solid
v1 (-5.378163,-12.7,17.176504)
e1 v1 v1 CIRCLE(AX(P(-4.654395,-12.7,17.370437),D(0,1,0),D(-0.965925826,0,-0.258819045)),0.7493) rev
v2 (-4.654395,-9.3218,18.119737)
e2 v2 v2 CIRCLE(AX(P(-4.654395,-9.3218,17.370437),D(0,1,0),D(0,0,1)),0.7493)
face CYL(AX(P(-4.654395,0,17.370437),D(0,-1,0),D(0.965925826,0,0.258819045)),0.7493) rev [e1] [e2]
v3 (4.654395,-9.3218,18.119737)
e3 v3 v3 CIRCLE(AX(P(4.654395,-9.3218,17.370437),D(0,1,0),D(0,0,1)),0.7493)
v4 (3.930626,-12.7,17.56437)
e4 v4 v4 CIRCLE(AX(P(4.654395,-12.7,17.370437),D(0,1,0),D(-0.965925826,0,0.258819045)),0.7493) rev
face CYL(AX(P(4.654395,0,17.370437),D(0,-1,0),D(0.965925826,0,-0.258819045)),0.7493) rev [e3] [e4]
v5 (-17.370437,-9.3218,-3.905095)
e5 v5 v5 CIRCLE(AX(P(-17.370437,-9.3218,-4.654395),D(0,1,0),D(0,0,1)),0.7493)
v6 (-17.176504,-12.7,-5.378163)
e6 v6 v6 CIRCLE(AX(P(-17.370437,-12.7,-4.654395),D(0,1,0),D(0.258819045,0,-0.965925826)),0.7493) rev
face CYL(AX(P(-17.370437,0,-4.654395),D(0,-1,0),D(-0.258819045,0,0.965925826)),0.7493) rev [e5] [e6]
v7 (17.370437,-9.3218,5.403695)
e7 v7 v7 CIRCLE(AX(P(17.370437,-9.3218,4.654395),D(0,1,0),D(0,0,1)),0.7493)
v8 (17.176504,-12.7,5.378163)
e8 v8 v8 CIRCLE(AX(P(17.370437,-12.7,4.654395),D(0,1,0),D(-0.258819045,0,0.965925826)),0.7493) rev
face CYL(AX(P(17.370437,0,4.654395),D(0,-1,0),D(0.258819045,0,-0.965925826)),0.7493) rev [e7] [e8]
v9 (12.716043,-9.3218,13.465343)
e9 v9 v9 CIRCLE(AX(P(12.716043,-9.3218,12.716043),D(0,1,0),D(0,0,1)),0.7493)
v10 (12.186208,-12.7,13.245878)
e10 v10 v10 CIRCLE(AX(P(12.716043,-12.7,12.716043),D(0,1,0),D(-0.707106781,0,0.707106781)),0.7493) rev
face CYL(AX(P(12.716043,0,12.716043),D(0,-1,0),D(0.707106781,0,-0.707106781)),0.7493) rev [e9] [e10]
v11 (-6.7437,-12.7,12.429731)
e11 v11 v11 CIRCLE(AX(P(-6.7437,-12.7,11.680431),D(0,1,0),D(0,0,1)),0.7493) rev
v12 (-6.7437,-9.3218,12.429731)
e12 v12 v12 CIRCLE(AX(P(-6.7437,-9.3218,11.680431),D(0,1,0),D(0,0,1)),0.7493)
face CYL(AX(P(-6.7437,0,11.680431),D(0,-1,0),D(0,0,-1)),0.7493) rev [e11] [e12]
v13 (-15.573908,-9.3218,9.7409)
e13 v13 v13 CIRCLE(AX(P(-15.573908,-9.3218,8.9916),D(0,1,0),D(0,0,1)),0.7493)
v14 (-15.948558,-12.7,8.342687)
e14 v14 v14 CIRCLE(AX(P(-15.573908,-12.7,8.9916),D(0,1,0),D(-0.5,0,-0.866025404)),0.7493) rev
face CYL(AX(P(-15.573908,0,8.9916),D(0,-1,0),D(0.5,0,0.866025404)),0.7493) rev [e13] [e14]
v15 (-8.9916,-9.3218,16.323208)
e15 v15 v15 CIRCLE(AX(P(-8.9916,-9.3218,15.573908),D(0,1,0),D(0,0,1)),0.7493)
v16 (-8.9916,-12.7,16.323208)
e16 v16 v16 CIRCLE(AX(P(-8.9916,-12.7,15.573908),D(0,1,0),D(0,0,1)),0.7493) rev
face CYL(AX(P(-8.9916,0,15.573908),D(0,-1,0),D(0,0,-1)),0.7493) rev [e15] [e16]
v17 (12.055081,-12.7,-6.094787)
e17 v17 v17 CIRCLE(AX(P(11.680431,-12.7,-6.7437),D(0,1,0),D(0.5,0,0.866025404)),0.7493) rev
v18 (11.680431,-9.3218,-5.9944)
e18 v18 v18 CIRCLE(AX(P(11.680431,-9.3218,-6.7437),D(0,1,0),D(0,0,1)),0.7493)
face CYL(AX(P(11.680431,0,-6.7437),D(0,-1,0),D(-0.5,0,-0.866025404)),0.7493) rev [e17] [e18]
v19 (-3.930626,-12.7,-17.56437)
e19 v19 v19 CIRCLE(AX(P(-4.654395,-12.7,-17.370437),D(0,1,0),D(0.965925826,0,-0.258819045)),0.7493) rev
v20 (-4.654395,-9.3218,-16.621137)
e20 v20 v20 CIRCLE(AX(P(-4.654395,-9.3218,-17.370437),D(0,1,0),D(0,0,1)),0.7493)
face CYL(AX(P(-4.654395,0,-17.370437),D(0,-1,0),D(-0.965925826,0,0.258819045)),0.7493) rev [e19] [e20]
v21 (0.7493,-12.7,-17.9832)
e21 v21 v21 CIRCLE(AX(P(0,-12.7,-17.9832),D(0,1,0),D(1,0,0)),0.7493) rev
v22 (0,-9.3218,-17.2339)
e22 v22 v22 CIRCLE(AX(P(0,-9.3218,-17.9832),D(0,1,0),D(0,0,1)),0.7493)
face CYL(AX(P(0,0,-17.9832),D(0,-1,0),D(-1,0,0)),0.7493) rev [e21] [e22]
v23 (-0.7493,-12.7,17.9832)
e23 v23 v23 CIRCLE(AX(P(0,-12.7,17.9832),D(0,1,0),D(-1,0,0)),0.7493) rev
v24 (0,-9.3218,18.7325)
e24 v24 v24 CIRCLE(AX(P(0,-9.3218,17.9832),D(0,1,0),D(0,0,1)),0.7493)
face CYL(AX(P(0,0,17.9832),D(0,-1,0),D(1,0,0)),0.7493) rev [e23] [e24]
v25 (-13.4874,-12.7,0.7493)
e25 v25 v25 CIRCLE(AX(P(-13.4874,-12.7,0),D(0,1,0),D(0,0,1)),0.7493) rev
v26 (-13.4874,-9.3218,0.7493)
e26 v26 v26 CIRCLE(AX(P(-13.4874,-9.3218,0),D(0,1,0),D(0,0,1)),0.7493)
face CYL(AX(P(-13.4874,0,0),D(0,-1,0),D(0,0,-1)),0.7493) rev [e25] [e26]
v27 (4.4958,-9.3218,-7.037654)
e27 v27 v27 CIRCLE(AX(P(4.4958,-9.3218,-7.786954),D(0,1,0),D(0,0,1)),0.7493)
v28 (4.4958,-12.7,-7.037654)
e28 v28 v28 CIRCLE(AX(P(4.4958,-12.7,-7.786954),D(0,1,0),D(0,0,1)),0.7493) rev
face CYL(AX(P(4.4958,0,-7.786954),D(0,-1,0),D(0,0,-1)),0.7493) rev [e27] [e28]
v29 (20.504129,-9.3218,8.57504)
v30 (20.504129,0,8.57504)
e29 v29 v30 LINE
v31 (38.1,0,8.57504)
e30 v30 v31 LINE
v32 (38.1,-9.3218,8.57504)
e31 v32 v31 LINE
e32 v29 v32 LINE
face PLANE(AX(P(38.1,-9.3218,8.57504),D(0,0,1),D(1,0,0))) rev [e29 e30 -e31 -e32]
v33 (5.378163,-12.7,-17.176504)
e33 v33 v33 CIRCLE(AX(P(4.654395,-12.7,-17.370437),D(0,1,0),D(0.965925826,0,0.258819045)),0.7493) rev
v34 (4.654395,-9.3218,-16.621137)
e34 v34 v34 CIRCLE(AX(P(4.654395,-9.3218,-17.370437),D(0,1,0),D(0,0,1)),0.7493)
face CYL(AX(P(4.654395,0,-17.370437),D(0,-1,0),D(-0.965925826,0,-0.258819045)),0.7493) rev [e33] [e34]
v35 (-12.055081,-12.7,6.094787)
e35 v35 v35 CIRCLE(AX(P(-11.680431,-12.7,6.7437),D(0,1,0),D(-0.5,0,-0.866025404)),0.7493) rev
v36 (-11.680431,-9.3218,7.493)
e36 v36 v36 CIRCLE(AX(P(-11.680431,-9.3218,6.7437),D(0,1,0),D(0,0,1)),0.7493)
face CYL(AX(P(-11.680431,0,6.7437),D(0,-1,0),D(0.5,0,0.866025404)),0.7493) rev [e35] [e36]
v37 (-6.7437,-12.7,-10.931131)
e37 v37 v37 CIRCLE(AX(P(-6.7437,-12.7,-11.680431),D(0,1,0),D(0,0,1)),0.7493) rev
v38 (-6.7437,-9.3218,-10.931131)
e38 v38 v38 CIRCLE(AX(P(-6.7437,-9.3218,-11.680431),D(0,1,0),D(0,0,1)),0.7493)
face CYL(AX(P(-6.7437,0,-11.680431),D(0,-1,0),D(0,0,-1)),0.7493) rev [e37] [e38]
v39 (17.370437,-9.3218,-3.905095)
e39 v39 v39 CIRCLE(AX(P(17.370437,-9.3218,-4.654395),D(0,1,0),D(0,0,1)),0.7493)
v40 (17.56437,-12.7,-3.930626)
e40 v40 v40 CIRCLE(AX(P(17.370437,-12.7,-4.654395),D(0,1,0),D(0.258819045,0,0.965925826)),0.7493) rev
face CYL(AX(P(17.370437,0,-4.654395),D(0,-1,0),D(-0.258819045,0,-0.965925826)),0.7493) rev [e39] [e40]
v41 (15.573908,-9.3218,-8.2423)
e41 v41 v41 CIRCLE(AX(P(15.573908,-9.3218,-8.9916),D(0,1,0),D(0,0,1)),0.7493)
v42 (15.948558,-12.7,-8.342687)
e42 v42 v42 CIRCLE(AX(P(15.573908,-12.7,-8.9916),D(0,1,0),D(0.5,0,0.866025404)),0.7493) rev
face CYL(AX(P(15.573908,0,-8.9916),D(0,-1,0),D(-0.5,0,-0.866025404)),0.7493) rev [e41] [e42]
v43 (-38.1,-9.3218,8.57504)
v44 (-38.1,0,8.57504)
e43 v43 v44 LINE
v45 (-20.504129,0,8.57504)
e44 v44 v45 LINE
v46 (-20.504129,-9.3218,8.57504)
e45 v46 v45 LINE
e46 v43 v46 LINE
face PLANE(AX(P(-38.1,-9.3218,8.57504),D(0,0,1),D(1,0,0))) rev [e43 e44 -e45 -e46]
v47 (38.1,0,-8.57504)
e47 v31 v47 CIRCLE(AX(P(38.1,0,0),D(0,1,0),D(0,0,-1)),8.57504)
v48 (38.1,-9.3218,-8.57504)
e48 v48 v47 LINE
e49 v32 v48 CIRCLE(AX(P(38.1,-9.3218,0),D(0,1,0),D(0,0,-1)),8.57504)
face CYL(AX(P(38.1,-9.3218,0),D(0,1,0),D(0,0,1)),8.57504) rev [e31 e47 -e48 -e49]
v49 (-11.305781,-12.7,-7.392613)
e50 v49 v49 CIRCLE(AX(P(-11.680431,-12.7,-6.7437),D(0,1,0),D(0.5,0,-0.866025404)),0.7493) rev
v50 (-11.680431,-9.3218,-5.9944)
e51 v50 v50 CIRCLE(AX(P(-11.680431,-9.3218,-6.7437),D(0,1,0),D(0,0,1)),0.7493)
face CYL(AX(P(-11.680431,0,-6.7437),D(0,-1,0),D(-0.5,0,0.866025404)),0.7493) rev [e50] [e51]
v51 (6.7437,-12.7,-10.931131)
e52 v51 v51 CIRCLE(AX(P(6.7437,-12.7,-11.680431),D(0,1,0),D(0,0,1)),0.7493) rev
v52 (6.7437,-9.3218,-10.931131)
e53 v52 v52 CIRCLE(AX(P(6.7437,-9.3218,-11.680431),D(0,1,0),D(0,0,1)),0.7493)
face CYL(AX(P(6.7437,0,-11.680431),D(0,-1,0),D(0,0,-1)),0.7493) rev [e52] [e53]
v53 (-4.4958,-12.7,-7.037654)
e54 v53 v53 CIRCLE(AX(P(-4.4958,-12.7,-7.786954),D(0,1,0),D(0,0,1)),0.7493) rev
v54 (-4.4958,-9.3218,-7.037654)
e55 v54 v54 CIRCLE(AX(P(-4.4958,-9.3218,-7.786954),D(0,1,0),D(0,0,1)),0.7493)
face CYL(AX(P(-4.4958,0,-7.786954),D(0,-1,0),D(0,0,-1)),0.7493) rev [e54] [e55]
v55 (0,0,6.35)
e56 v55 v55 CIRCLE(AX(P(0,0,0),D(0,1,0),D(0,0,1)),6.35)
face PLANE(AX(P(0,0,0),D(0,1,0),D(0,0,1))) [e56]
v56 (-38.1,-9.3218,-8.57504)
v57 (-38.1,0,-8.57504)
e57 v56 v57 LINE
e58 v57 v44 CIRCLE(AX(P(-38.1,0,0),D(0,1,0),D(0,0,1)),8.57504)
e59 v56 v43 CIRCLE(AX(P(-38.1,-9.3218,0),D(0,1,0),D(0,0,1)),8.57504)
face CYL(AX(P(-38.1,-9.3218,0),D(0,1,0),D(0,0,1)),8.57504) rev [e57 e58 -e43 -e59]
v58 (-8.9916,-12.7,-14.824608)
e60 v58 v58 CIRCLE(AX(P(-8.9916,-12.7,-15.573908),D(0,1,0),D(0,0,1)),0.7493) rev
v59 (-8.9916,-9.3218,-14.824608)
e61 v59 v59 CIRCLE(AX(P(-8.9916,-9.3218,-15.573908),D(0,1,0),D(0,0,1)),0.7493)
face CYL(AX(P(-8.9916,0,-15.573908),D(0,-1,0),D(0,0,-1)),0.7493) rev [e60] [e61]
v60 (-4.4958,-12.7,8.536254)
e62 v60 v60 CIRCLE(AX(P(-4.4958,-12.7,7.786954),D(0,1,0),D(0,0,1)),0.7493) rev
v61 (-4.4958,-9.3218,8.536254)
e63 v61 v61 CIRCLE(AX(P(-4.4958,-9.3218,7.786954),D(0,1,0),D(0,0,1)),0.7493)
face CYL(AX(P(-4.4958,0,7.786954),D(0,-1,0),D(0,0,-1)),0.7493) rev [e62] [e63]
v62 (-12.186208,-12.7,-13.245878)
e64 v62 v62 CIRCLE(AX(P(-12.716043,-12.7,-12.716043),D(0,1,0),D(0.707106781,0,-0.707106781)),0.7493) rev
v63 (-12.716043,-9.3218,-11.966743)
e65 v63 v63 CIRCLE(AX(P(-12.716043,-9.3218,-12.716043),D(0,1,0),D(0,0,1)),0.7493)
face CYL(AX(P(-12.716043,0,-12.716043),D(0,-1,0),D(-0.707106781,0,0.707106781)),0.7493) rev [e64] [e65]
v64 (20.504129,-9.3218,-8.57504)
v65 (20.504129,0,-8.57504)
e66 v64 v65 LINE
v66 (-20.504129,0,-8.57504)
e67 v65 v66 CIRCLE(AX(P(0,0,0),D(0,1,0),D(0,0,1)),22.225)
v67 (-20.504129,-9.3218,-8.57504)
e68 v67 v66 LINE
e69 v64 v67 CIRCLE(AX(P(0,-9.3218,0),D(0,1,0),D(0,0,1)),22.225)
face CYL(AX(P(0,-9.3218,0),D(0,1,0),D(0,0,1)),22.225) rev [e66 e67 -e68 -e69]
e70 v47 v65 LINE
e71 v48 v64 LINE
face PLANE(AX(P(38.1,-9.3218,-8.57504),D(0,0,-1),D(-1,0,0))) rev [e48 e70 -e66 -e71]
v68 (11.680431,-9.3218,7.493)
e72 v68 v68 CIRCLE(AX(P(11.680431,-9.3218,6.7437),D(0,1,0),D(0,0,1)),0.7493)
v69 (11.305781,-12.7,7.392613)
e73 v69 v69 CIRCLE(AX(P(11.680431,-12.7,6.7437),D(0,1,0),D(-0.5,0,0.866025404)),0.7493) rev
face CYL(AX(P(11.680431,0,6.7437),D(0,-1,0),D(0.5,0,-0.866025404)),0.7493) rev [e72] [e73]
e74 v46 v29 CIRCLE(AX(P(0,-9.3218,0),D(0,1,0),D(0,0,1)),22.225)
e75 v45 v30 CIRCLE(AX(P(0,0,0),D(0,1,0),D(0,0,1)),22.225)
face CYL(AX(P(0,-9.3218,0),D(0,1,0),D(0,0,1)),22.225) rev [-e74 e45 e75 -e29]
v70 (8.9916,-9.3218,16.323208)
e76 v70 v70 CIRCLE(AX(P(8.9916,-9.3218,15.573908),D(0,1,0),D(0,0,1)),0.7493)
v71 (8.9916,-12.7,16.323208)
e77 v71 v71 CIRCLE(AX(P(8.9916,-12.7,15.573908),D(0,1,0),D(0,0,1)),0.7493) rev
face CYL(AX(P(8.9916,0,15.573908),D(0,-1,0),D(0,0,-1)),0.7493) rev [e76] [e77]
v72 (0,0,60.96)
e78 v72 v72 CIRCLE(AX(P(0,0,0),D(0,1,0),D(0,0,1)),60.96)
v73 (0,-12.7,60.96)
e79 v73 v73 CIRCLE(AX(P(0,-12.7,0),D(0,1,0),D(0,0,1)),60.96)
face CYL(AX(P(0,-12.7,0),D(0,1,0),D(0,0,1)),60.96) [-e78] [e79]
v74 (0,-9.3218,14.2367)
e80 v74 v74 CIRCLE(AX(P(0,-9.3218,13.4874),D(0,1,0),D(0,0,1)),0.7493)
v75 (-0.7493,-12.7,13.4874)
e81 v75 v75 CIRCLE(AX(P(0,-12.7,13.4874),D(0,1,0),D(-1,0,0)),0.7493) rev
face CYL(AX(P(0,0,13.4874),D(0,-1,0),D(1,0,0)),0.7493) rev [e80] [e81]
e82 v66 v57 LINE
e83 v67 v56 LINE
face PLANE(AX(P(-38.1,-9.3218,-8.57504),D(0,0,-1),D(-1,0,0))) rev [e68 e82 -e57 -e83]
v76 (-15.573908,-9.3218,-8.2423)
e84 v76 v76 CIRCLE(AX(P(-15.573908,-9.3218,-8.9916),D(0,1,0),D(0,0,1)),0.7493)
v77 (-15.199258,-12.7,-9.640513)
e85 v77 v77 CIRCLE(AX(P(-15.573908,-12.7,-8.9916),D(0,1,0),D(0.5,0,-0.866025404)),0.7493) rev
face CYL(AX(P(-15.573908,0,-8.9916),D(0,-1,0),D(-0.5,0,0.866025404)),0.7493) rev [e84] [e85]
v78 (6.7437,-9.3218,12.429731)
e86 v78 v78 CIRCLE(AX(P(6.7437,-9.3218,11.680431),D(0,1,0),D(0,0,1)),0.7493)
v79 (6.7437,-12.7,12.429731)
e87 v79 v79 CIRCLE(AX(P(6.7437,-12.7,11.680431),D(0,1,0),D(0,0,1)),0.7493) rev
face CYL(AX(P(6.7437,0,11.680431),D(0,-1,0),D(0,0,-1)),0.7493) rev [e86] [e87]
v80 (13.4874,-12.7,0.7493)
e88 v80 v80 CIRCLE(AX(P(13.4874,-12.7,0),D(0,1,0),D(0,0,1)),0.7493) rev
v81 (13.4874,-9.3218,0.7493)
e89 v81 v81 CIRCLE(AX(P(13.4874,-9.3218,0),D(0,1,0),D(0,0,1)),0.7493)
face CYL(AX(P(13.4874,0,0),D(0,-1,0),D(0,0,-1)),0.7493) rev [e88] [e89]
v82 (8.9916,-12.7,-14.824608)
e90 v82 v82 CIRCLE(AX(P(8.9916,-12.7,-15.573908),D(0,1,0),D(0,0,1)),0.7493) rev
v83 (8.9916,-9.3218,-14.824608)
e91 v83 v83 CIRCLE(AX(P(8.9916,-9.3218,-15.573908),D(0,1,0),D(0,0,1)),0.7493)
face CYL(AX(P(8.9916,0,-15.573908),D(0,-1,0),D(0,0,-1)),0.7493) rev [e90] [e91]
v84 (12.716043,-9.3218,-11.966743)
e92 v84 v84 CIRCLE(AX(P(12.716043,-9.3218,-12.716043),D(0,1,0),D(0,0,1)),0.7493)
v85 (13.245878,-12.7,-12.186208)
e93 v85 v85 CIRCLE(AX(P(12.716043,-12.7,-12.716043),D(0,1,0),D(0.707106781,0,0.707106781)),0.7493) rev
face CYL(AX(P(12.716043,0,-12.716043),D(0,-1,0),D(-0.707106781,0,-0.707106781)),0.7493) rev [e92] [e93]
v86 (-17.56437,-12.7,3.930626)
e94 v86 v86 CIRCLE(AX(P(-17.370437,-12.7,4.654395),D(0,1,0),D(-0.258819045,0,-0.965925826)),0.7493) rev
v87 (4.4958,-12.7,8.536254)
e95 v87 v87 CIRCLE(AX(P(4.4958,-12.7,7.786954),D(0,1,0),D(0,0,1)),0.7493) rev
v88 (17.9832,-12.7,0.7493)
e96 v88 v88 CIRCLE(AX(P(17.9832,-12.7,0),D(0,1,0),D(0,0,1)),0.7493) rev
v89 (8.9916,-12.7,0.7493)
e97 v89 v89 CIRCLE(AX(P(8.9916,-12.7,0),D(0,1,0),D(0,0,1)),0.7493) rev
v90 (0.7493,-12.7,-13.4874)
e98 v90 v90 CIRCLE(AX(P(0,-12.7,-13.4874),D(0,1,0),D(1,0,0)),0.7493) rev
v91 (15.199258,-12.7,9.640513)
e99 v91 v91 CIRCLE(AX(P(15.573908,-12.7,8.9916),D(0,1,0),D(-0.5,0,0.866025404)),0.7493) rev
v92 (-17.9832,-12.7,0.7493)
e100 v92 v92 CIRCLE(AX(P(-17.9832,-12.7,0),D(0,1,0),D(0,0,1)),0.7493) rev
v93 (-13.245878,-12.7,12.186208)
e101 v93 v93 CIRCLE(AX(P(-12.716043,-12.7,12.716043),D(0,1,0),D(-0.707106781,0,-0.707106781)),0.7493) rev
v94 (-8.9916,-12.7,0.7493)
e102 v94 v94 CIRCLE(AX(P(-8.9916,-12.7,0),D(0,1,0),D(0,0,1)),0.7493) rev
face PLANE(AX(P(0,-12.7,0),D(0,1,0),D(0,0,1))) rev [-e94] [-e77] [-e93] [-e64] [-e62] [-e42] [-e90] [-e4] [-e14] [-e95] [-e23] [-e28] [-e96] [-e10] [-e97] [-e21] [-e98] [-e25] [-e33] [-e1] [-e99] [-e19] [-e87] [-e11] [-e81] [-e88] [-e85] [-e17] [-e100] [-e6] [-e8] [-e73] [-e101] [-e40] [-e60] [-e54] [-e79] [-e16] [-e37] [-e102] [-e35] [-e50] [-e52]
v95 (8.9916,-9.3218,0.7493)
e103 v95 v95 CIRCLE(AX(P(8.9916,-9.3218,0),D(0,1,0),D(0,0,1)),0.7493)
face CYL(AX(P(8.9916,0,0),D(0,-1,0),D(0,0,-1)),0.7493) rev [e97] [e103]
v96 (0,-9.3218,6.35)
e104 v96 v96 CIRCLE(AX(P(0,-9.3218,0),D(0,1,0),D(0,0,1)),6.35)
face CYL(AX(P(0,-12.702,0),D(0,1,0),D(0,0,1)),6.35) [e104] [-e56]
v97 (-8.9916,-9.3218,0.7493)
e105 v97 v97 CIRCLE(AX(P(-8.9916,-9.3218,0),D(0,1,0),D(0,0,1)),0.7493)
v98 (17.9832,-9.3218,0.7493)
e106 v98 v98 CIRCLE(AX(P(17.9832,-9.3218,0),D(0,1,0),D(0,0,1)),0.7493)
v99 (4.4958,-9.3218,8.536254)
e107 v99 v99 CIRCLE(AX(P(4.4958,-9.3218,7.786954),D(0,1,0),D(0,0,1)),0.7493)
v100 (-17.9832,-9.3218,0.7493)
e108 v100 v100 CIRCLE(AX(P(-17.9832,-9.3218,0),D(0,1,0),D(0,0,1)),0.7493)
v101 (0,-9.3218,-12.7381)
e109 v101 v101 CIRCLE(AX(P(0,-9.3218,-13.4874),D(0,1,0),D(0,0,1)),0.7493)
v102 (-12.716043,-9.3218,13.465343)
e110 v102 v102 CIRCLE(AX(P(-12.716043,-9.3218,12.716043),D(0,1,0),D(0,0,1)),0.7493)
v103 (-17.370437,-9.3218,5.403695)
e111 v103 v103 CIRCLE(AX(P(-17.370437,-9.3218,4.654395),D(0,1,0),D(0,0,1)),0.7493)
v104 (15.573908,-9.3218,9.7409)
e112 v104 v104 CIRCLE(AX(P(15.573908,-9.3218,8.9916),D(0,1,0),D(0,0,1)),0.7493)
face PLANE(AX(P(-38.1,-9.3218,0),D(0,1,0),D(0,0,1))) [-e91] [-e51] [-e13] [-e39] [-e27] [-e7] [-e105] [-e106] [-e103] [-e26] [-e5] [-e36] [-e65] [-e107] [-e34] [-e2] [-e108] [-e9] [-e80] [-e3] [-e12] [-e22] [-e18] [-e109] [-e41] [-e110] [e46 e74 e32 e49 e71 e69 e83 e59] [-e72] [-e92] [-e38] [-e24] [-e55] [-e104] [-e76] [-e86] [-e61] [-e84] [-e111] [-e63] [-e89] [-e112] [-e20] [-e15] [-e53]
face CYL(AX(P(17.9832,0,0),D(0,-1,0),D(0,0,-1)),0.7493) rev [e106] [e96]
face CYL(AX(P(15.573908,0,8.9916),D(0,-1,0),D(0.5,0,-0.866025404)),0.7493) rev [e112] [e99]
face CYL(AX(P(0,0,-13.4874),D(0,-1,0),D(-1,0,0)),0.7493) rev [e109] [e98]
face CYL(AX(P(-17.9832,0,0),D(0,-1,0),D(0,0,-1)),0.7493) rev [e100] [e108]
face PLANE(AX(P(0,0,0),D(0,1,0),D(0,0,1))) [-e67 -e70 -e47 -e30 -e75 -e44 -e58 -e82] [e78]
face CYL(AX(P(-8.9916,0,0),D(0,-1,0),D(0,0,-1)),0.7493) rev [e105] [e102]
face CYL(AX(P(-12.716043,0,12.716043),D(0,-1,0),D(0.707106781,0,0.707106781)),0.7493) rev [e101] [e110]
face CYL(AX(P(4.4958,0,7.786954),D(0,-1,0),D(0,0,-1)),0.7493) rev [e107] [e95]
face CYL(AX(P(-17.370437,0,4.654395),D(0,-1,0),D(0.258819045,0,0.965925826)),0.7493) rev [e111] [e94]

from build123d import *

# Parameters (mm, degrees)
SKETCH1_R                       = 60.96
BILLET_DEPTH                    = 12.7
SKETCH4_R                       = 0.7493
FIRST_KEROSENE_OUTLET_DEPTH     = 88.140881336
PRIMARY_HOLES_COUNT             = 6
SECOND_START                    = -12.7
SECOND_RING_OUTLINE_R           = 0.7493
SECOND_RING_DEPTH               = 12.7
THIRD_START                     = -12.7
THIRD_RING_OUTLINE_R            = 0.7493
THIRD_RING_DEPTH                = 12.7
KEROSENE_WELL_DEPTH             = 9.3218
SKETCH17_R                      = 6.35
BOSS_EXTRUDE1_DEPTH             = 2.54
BOSS_EXTRUDE1_DIRECTION_2_REACH = 89.141
SKETCH19_R                      = 6.35
LOX_TOWER_DEPTH                 = 2.54


# Read off the part's stored shape, not the designer's step: Second ring, Third Ring
with BuildPart() as part:
    # Sketch1 → Billet (new body)
    with BuildSketch(Plane(origin=(0, 0, 0), x_dir=(1, 0, 0), z_dir=(0, 1, 0))):
        with Locations(Location((0, 0, 0), (0, 0, 270))):
            Circle(SKETCH1_R)
    extrude(amount=-BILLET_DEPTH)

    # Sketch4 → First Kerosene Outlet (cut, symmetric)
    with BuildSketch(Plane(origin=(0, -12.7, 0), x_dir=(1, 0, 0), z_dir=(0, 1, 0))):
        with Locations(Location((8.9916, 0, 0), (0, 0, 270))):
            Circle(SKETCH4_R)
        with Locations(Location((13.4874, 0, 0), (0, 0, 270))):
            Circle(SKETCH4_R)
        with Locations(Location((17.9832, 0, 0), (0, 0, 270))):
            Circle(SKETCH4_R)
    first_kerosene_outlet = extrude(amount=FIRST_KEROSENE_OUTLET_DEPTH, both=True, mode=Mode.SUBTRACT)

    # Primary Holes: First Kerosene Outlet ×6 about axis
    primary_holes_axis = Axis((0, 0, 0), (0, 1, 0))
    for i in range(1, PRIMARY_HOLES_COUNT):
        add(first_kerosene_outlet.rotate(primary_holes_axis, i * 360 / PRIMARY_HOLES_COUNT), mode=Mode.SUBTRACT)

    # Second ring outline → Second ring (cut)
    with BuildSketch(Plane(origin=(0, 0, 0), x_dir=(1, 0, 0), z_dir=(0, 1, 0)).offset(SECOND_START)):
        with Locations((11.680431031, 6.7437)):
            Circle(SECOND_RING_OUTLINE_R)
        with Locations((0, 13.4874)):
            Circle(SECOND_RING_OUTLINE_R)
        with Locations((-11.680431031, 6.7437)):
            Circle(SECOND_RING_OUTLINE_R)
        with Locations((-11.680431031, -6.7437)):
            Circle(SECOND_RING_OUTLINE_R)
        with Locations((0, -13.4874)):
            Circle(SECOND_RING_OUTLINE_R)
        with Locations((11.680431031, -6.7437)):
            Circle(SECOND_RING_OUTLINE_R)
    extrude(amount=SECOND_RING_DEPTH, mode=Mode.SUBTRACT)

    # Third Ring outline → Third Ring (cut)
    with BuildSketch(Plane(origin=(0, 0, 0), x_dir=(1, 0, 0), z_dir=(0, 1, 0)).offset(THIRD_START)):
        with Locations((17.370437319, 4.654394652)):
            Circle(THIRD_RING_OUTLINE_R)
        with Locations((15.573908041, 8.9916)):
            Circle(THIRD_RING_OUTLINE_R)
        with Locations((12.716042667, 12.716042667)):
            Circle(THIRD_RING_OUTLINE_R)
        with Locations((4.654394652, 17.370437319)):
            Circle(THIRD_RING_OUTLINE_R)
        with Locations((0, 17.9832)):
            Circle(THIRD_RING_OUTLINE_R)
        with Locations((-4.654394652, 17.370437319)):
            Circle(THIRD_RING_OUTLINE_R)
        with Locations((-12.716042667, 12.716042667)):
            Circle(THIRD_RING_OUTLINE_R)
        with Locations((-15.573908041, 8.9916)):
            Circle(THIRD_RING_OUTLINE_R)
        with Locations((-17.370437319, 4.654394652)):
            Circle(THIRD_RING_OUTLINE_R)
        with Locations((-17.370437319, -4.654394652)):
            Circle(THIRD_RING_OUTLINE_R)
        with Locations((-15.573908041, -8.9916)):
            Circle(THIRD_RING_OUTLINE_R)
        with Locations((-12.716042667, -12.716042667)):
            Circle(THIRD_RING_OUTLINE_R)
        with Locations((-4.654394652, -17.370437319)):
            Circle(THIRD_RING_OUTLINE_R)
        with Locations((0, -17.9832)):
            Circle(THIRD_RING_OUTLINE_R)
        with Locations((4.654394652, -17.370437319)):
            Circle(THIRD_RING_OUTLINE_R)
        with Locations((12.716042667, -12.716042667)):
            Circle(THIRD_RING_OUTLINE_R)
        with Locations((15.573908041, -8.9916)):
            Circle(THIRD_RING_OUTLINE_R)
        with Locations((17.370437319, -4.654394652)):
            Circle(THIRD_RING_OUTLINE_R)
    extrude(amount=THIRD_RING_DEPTH, mode=Mode.SUBTRACT)

    # Sketch18 → Kerosene Well (cut)
    with BuildSketch(Plane(origin=(0, 0, 0), x_dir=(1, 0, 0), z_dir=(0, 1, 0))):
        with BuildLine():
            Line((-38.1, 8.57504), (-20.504129194, 8.57504))
            ThreePointArc((-20.504129194, 8.57504), (0, 22.225), (20.504129194, 8.57504))
            Line((20.504129194, 8.57504), (38.1, 8.57504))
            ThreePointArc((38.1, 8.57504), (46.67504, 0), (38.1, -8.57504))
            Line((38.1, -8.57504), (20.504129194, -8.57504))
            ThreePointArc((20.504129194, -8.57504), (0, -22.225), (-20.504129194, -8.57504))
            Line((-20.504129194, -8.57504), (-38.1, -8.57504))
            ThreePointArc((-38.1, -8.57504), (-46.67504, 0), (-38.1, 8.57504))
        make_face()
    extrude(amount=-KEROSENE_WELL_DEPTH, mode=Mode.SUBTRACT)

    # Sketch17 → Boss-Extrude1 (add)
    with BuildSketch(Plane(origin=(0, 0, 0), x_dir=(1, 0, 0), z_dir=(0, 1, 0))):
        with Locations(Location((0, 0, 0), (0, 0, 270))):
            Circle(SKETCH17_R)
    extrude(amount=BOSS_EXTRUDE1_DEPTH)

    # Sketch17 → Boss-Extrude1 direction 2 (add, up to next)
    with BuildSketch(Plane(origin=(0, 0, 0), x_dir=(1, 0, 0), z_dir=(0, 1, 0)), mode=Mode.PRIVATE) as boss_extrude1_direction_2_sk1:
        with Locations(Location((0, 0, 0), (0, 0, 270))):
            Circle(SKETCH17_R)
    boss_extrude1_direction_2_tool1 = extrude(boss_extrude1_direction_2_sk1.sketch, amount=-BOSS_EXTRUDE1_DIRECTION_2_REACH, mode=Mode.PRIVATE) - part.part
    add(boss_extrude1_direction_2_tool1.solids().sort_by_distance((0, 0, 0))[0])

    # Sketch19 → Lox Tower (cut)
    with BuildSketch(Plane(origin=(0, 2.54, 0), x_dir=(1, 0, 0), z_dir=(0, 1, 0))):
        with Locations(Location((0, 0, 0), (0, 0, 270))):
            Circle(SKETCH19_R)
    extrude(amount=-LOX_TOWER_DEPTH, mode=Mode.SUBTRACT)


solid = part.part
